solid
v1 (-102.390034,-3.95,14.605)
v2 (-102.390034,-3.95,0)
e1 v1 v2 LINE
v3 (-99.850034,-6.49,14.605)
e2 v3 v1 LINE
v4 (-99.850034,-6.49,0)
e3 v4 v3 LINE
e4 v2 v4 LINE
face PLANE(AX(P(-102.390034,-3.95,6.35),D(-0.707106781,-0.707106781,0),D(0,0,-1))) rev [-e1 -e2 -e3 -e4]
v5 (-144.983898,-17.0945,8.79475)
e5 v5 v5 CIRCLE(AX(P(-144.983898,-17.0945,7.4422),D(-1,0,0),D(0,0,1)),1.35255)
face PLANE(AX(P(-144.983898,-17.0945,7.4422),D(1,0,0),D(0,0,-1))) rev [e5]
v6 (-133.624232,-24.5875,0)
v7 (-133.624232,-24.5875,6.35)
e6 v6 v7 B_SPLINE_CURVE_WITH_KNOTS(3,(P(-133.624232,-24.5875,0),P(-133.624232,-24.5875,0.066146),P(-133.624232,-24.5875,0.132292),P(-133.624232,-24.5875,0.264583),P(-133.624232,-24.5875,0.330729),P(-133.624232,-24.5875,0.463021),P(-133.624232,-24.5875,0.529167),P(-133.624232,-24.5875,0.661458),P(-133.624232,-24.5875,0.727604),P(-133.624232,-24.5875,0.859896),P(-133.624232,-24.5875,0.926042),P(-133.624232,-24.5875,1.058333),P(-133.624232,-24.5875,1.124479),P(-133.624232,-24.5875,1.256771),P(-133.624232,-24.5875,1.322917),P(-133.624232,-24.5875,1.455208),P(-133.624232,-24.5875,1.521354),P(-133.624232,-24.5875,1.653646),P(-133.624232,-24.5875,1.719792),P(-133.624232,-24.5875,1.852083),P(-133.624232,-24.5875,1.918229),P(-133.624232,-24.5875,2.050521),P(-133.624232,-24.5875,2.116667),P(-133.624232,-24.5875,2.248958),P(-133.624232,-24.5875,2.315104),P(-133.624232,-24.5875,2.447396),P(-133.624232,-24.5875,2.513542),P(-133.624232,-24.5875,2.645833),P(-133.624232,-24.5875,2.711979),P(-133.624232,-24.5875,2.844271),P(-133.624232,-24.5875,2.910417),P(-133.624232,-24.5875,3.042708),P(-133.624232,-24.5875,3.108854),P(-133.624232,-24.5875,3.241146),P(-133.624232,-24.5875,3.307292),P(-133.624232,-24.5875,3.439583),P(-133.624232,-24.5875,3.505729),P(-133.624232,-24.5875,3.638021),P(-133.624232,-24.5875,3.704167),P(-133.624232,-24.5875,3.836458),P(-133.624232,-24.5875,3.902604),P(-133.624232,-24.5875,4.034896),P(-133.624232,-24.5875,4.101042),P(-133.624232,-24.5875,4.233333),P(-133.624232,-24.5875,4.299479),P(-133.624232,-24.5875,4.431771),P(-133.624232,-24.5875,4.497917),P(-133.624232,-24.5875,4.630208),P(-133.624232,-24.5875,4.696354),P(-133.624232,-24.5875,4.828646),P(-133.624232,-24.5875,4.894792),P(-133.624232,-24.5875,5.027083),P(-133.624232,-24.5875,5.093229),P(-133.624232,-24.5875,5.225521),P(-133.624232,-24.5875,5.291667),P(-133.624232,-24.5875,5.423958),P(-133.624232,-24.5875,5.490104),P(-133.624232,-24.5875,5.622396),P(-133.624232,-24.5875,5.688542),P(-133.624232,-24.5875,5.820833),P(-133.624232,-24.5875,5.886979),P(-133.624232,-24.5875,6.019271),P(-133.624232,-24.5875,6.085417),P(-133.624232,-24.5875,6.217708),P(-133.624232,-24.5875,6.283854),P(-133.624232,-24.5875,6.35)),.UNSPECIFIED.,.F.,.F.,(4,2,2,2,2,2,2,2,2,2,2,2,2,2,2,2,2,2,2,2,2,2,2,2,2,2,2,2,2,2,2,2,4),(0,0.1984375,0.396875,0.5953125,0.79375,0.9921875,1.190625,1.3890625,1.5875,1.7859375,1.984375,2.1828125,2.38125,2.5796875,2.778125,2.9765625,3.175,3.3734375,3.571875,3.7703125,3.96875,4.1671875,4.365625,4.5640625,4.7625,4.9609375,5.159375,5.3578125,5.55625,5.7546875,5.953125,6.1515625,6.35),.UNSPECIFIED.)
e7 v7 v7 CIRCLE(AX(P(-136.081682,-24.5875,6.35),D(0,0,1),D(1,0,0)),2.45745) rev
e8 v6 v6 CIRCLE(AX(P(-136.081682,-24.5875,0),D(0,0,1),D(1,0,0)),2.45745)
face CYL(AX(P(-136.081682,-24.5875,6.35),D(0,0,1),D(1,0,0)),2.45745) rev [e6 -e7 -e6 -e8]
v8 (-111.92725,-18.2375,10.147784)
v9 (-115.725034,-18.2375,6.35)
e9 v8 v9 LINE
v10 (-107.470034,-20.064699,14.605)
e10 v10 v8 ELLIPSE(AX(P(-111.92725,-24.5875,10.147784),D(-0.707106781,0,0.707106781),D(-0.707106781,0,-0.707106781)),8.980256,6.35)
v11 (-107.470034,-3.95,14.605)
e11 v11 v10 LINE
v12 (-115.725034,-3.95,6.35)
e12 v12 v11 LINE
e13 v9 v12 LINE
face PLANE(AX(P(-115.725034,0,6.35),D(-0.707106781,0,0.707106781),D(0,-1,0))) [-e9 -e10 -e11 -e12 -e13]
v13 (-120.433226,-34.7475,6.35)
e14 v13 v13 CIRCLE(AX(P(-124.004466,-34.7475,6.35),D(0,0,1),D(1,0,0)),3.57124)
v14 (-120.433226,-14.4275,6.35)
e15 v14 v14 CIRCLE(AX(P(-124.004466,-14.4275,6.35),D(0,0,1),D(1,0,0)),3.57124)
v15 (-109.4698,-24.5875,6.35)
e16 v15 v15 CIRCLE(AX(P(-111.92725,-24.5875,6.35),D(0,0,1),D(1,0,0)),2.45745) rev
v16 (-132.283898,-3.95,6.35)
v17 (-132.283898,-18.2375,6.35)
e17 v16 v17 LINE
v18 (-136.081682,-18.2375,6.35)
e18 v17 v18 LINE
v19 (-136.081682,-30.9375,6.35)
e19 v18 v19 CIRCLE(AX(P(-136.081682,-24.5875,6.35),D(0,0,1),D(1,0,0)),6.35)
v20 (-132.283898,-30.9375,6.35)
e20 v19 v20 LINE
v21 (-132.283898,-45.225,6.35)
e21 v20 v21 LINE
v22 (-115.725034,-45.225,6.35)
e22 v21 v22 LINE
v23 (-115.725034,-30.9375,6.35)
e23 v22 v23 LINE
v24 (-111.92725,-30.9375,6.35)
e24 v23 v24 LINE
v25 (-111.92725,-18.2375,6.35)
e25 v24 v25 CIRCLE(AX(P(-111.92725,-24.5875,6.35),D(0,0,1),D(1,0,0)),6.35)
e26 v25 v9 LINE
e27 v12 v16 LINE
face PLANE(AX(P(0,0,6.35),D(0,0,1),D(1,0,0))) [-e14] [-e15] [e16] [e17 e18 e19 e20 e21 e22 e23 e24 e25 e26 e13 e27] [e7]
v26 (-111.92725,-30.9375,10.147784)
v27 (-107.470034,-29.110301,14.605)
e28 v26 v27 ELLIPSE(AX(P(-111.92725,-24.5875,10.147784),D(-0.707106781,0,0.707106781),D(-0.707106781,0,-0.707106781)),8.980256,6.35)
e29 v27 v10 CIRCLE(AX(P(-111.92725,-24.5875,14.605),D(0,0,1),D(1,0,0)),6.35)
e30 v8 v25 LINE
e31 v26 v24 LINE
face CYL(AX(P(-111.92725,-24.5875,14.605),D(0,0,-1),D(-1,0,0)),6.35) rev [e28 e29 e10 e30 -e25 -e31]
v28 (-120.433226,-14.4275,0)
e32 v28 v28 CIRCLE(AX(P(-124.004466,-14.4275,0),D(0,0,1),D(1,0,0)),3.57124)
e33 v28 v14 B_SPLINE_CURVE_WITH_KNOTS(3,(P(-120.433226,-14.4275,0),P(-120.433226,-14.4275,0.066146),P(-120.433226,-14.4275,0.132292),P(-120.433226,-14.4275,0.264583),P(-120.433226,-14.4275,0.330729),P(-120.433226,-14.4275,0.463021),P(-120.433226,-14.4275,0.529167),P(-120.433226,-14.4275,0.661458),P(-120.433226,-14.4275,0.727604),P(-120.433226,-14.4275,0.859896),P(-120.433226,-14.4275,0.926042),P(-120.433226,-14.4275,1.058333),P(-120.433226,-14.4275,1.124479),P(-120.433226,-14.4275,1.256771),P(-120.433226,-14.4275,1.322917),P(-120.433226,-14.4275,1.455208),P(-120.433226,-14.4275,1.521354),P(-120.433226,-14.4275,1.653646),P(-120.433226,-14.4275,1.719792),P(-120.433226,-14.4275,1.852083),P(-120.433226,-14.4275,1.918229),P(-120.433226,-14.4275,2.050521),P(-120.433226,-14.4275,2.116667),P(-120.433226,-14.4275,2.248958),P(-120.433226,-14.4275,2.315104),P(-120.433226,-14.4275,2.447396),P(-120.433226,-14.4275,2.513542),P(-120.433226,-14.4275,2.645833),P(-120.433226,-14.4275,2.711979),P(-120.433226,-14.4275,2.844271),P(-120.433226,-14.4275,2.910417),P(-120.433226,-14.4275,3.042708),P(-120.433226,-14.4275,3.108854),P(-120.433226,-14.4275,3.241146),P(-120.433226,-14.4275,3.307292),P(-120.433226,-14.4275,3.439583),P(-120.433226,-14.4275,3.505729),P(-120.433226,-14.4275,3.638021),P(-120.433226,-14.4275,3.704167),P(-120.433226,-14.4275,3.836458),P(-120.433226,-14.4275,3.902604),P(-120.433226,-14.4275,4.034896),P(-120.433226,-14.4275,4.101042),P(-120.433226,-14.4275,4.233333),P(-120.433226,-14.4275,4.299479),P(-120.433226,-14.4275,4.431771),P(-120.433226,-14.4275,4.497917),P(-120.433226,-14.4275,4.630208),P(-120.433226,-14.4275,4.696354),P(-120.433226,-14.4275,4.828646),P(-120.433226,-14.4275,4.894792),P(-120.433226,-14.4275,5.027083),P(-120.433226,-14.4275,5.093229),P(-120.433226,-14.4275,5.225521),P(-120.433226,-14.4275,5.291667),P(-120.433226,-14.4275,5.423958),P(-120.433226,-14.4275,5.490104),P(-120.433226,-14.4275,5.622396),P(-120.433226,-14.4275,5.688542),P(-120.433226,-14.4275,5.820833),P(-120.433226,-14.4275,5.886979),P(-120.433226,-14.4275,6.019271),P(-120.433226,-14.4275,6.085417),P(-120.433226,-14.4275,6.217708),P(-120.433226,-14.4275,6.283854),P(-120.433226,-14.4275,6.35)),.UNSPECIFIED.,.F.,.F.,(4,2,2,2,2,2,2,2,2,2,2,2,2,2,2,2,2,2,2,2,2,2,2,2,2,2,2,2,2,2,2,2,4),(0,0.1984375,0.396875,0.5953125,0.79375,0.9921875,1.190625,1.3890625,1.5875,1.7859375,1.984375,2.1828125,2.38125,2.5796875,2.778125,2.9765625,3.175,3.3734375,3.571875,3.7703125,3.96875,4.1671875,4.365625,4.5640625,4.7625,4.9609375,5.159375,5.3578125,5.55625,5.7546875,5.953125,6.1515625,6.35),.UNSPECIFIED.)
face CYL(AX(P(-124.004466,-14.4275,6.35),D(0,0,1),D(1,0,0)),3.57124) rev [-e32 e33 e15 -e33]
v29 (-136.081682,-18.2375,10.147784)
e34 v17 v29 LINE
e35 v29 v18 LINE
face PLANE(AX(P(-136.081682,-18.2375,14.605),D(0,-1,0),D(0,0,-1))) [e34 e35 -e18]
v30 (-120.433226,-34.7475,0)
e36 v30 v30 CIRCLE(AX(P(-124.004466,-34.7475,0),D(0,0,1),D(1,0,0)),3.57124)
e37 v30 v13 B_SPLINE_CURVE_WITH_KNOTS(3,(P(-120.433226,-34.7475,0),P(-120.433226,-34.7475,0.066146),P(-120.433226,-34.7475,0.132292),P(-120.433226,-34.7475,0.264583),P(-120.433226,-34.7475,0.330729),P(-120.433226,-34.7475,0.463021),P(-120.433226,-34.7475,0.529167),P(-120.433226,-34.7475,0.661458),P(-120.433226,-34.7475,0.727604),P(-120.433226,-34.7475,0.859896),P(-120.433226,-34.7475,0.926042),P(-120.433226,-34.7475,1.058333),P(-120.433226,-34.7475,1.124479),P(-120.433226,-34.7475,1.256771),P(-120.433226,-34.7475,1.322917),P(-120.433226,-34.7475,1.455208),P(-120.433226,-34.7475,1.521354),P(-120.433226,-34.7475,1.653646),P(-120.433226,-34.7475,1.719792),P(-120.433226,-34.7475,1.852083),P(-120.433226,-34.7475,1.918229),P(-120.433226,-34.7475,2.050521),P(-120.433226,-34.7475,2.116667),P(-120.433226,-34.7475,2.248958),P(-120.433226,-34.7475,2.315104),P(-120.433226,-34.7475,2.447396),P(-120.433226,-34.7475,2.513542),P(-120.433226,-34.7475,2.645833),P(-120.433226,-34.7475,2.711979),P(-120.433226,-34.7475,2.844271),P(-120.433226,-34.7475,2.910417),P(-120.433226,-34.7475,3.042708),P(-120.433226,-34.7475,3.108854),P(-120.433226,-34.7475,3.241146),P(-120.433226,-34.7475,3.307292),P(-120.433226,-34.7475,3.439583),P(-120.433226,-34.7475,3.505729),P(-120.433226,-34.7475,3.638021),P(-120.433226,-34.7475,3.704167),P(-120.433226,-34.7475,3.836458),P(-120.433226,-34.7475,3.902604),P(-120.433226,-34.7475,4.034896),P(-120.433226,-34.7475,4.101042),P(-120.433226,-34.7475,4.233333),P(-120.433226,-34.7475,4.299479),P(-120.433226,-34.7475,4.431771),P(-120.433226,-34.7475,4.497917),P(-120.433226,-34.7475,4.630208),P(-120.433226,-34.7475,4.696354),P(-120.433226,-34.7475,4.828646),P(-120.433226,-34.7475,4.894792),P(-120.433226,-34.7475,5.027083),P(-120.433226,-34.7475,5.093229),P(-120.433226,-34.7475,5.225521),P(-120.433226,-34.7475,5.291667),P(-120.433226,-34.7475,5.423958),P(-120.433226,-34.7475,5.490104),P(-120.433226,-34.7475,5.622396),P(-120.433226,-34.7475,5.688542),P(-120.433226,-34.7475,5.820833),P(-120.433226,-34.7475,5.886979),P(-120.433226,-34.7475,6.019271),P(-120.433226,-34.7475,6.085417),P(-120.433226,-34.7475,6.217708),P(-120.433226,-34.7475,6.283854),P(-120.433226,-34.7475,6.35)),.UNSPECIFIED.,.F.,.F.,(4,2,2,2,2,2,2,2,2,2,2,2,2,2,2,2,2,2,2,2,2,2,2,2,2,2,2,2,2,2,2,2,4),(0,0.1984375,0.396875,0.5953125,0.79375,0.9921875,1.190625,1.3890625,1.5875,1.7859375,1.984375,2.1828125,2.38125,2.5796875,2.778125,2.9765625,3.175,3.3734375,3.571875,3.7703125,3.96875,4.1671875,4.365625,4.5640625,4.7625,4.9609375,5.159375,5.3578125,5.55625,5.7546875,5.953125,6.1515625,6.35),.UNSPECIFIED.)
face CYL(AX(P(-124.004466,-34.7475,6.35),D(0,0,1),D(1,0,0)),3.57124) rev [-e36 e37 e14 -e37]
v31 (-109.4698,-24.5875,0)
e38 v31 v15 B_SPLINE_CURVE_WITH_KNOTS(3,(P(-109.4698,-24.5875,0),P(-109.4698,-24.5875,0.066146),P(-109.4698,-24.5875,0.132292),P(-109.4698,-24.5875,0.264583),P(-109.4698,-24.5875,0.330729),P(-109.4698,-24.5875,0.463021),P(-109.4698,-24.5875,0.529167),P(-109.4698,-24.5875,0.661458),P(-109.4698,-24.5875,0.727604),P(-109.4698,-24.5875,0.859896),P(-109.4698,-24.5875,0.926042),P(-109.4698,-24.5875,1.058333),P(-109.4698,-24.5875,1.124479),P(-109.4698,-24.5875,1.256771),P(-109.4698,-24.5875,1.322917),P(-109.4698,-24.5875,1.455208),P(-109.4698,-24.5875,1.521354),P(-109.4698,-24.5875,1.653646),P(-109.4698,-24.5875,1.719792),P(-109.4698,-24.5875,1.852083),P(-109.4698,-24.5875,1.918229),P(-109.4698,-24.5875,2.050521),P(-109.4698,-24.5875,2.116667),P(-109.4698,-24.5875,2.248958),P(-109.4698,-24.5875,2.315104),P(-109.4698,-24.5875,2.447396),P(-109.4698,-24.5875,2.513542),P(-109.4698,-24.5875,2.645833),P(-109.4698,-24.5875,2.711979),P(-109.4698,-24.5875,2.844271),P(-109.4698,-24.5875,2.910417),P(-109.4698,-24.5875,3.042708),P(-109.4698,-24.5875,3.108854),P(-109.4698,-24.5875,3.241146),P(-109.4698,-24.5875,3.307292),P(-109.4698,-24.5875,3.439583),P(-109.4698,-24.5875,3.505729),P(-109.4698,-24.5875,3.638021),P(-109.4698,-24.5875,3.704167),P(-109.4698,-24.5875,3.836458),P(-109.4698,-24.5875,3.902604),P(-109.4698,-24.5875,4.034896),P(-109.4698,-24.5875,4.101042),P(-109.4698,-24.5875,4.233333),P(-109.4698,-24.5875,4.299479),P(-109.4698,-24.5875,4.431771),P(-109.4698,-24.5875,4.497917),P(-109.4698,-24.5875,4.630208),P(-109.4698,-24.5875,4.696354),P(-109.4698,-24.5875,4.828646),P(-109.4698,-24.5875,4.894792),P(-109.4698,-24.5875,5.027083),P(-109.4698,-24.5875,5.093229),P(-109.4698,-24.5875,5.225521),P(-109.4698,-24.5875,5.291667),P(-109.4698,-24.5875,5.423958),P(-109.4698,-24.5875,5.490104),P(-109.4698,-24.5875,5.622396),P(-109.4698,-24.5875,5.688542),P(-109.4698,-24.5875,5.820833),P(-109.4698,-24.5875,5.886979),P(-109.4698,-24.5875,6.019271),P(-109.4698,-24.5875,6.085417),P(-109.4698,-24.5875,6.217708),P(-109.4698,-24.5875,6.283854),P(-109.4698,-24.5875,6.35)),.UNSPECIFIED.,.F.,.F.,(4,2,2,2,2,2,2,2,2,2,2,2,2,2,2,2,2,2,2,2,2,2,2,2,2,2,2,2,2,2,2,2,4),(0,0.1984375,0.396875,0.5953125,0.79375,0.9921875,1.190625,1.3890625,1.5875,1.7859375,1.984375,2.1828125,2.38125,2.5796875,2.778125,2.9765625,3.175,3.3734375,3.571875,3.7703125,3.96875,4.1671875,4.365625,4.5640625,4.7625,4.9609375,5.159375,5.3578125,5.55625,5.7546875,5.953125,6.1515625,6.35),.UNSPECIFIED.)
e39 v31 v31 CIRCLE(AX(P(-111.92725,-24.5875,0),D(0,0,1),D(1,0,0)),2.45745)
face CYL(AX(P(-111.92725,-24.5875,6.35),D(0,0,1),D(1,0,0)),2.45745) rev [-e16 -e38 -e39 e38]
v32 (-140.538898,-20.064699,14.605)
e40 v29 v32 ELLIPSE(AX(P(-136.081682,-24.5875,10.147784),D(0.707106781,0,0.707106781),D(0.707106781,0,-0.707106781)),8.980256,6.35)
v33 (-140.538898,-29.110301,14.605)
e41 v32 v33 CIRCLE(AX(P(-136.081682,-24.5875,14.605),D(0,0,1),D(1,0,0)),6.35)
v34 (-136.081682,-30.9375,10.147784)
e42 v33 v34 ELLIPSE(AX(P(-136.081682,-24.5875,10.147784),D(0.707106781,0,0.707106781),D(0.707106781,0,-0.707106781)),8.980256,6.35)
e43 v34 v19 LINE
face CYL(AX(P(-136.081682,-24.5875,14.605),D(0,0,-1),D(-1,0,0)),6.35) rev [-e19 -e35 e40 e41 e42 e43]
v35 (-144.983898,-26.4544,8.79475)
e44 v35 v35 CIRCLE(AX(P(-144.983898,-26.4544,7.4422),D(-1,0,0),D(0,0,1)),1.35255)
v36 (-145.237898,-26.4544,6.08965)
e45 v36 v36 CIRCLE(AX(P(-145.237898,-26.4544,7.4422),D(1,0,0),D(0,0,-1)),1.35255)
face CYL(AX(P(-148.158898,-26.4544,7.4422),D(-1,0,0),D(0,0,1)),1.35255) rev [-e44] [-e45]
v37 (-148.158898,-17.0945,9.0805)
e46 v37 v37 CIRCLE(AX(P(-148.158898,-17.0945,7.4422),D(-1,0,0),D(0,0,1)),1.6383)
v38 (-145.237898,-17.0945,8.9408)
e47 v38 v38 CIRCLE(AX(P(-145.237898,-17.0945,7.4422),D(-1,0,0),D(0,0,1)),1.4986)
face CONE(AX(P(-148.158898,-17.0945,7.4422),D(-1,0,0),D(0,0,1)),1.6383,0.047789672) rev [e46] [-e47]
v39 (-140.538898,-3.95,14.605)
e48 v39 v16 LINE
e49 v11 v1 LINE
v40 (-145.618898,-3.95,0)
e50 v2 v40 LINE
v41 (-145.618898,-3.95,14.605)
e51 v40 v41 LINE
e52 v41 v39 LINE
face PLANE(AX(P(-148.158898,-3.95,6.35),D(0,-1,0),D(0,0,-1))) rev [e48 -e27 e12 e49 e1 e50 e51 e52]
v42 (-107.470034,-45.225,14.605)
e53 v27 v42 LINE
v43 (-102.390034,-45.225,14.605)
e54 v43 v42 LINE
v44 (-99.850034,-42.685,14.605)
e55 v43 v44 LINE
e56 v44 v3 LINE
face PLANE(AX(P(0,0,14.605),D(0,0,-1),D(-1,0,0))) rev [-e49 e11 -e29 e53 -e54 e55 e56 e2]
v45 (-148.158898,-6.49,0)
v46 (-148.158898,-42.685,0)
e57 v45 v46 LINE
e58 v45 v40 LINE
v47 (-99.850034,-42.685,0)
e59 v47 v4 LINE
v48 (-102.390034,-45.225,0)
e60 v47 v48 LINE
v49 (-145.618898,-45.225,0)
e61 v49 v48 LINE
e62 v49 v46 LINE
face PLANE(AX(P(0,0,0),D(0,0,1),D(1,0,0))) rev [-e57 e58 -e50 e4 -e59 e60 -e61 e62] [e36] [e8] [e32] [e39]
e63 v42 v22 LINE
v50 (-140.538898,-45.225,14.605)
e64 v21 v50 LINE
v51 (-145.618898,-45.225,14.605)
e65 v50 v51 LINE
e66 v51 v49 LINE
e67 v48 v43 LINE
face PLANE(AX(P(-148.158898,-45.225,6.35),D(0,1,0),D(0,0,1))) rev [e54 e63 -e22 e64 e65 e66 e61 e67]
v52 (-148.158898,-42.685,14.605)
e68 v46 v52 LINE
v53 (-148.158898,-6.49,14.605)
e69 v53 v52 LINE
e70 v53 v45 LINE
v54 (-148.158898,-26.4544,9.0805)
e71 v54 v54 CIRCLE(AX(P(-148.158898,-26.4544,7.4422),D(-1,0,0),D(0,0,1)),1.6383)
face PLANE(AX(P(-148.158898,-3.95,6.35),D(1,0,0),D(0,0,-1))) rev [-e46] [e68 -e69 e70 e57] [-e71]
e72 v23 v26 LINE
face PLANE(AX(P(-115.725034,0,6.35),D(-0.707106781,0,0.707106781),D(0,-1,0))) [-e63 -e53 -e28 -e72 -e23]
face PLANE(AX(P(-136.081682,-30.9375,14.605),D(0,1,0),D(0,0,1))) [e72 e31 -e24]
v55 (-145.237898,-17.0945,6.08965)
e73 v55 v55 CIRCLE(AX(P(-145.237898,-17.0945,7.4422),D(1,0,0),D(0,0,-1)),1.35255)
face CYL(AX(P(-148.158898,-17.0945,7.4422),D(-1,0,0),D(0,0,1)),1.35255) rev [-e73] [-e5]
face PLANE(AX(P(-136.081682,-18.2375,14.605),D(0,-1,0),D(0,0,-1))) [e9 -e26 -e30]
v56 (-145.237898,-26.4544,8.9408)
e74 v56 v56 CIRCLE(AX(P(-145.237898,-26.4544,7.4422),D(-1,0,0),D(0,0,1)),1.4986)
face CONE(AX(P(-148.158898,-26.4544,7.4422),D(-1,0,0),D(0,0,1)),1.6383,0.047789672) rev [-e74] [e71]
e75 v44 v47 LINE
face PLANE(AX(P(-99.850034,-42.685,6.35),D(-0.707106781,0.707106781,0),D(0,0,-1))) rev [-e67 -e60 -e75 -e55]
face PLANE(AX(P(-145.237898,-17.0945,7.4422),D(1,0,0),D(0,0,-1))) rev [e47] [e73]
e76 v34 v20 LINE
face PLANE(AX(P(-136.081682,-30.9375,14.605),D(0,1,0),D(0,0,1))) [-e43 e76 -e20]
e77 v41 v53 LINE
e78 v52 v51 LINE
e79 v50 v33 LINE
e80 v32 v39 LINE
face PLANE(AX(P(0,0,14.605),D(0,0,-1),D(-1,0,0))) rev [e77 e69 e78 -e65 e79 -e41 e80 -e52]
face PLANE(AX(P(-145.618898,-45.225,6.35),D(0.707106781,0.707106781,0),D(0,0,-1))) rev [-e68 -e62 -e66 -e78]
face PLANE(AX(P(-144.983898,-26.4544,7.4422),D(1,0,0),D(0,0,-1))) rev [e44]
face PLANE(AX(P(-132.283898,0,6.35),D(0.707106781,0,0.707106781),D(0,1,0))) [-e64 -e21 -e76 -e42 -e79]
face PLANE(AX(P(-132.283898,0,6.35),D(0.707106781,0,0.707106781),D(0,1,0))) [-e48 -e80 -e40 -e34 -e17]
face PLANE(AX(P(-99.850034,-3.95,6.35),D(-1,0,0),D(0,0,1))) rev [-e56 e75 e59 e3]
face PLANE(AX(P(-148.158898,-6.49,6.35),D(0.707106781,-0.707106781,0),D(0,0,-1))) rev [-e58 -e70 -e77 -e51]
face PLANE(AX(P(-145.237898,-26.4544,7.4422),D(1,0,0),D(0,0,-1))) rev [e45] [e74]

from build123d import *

# Parameters (mm, degrees)
SKETCH1_W                 = 48.308864232
SKETCH1_H                 = 41.275
BOSS_EXTRUDE1_DEPTH       = 6.35
F_8_CLEARANCE_HOLE1_D     = 4.9149
F_1_4_CLEARANCE_HOLE1_D   = 7.14248
SKETCH9_W                 = 6.35
SKETCH9_H                 = 41.275
EXTRUDE_THIN1_DEPTH       = 8.255
CHAMFER2_SIZE             = 9.525
CUT_EXTRUDE1_DEPTH        = 156.127382276
CHAMFER1_SIZE             = 2.54
HOLE1_AT_2_COUNT          = 2
HOLE1_AT_2_PITCH          = 9.3599
F_2_CLEARANCE_HOLE1_D     = 2.7051
F_2_CLEARANCE_HOLE1_DEPTH = 3.175


with BuildPart() as part:
    # Sketch1 → Boss-Extrude1 (new body)
    with BuildSketch(Plane.XY):
        with Locations((-124.004465969, -24.5875)):
            Rectangle(SKETCH1_W, SKETCH1_H)
    extrude(amount=BOSS_EXTRUDE1_DEPTH)

    # #8 Clearance Hole1 (through all)
    with Locations(Plane.XY.offset(6.35)):
        with Locations((-111.927249911, -24.5875), (-136.081682027, -24.5875)):
            Hole(F_8_CLEARANCE_HOLE1_D / 2)

    # 1/4 Clearance Hole1 (through all)
    with Locations(Plane.XY.offset(6.35)):
        with Locations((-124.004465969, -14.4275), (-124.004465969, -34.7475)):
            Hole(F_1_4_CLEARANCE_HOLE1_D / 2)

    # Sketch9 → Extrude-Thin1 (add)
    with BuildSketch(Plane.XY.offset(6.35)):
        with Locations((-103.025033853, -24.5875)):
            Rectangle(SKETCH9_W, SKETCH9_H)
        with Locations((-144.983898085, -24.5875)):
            Rectangle(SKETCH9_W, SKETCH9_H)
    extrude(amount=EXTRUDE_THIN1_DEPTH)

    # Chamfer2
    # the kernel refuses this chamfer: 9.525 mm, written as the material it adds along each edge
    with BuildSketch(Plane(origin=(-106.200033853, -3.95, 6.35), x_dir=(0.0274958766105871, 0, 0.9996219169112966), z_dir=(0, -1, 0))) as chamfer2_piece_1_section:
        Polygon((CHAMFER2_SIZE * 0.999621916911, CHAMFER2_SIZE * 0.0274958766106), (-CHAMFER2_SIZE * 0.0274958766106, CHAMFER2_SIZE * 0.999621916911), (0, 0), align=None)
    chamfer2_piece_1 = extrude(amount=41.275, mode=Mode.PRIVATE)
    chamfer2_piece_1 = chamfer2_piece_1 - Plane(origin=(-111.927249911, -24.5875, 9.368765613), x_dir=(-1, 0, 0), z_dir=(0, 0, -1)) * Cylinder(2.45745, 121, mode=Mode.PRIVATE)
    chamfer2_piece_1 = split(chamfer2_piece_1, bisect_by=Plane(origin=(-109.341812124, -24.58749874, 14.605), z_dir=(0, 0, -1)), keep=Keep.TOP, mode=Mode.PRIVATE)
    add(chamfer2_piece_1)
    with BuildSketch(Plane(origin=(-141.808898085, -45.225, 6.35), x_dir=(0.9996219169112968, 0, -0.027495876610586386), z_dir=(0, 1, 0))) as chamfer2_piece_2_section:
        Polygon((CHAMFER2_SIZE * 0.999621916911, -CHAMFER2_SIZE * 0.0274958766106), (-CHAMFER2_SIZE * 0.0274958766106, -CHAMFER2_SIZE * 0.999621916911), (0, 0), align=None)
    chamfer2_piece_2 = extrude(amount=41.275, mode=Mode.PRIVATE)
    chamfer2_piece_2 = chamfer2_piece_2 - Plane(origin=(-136.081682027, -24.5875, 9.368765819), x_dir=(-1, 0, 0), z_dir=(0, 0, -1)) * Cylinder(2.45745, 121, mode=Mode.PRIVATE)
    chamfer2_piece_2 = split(chamfer2_piece_2, bisect_by=Plane(origin=(-138.667118685, -24.587501904, 14.605), z_dir=(0, 0, -1)), keep=Keep.TOP, mode=Mode.PRIVATE)
    add(chamfer2_piece_2)

    # Sketch10 → Cut-Extrude1 (cut, through all)
    with BuildSketch(Plane.XY.offset(6.35)):
        with BuildLine():
            Line((-136.081682027, -18.2375), (-111.927249911, -18.2375))
            ThreePointArc((-111.927249911, -18.2375), (-105.577249911, -24.5875), (-111.927249911, -30.9375))
            Line((-111.927249911, -30.9375), (-136.081682027, -30.9375))
            ThreePointArc((-136.081682027, -30.9375), (-142.431682027, -24.5875), (-136.081682027, -18.2375))
        make_face()
    extrude(amount=CUT_EXTRUDE1_DEPTH, mode=Mode.SUBTRACT)

    # Chamfer1
    chamfer1_edges = [part.edges().sort_by_distance(p)[0] for p in [
        (-99.850033853, -45.225, 7.3025),
        (-148.158898085, -45.225, 7.3025),
        (-148.158898085, -3.95, 7.3025),
        (-99.850033853, -3.95, 7.3025),
    ]]
    chamfer(chamfer1_edges, length=CHAMFER1_SIZE)

    # Sketch12 → Hole1 (revolve, cut)
    with BuildSketch(Plane(origin=(-148.158898085, -26.4544, 7.4422), x_dir=(0, 0, 1), z_dir=(0, 1, 0))):
        Polygon((0, 0), (0, 2.921), (1.4986, 2.921), (1.6383, 0), align=None)
    hole1 = revolve(axis=Axis((-38.158898085, -26.4544, 7.4422), (-1, 0, 0)), mode=Mode.SUBTRACT)

    # Hole1 at 2: Hole1 ×2
    with Locations(*[(0, i * HOLE1_AT_2_PITCH, 0) for i in range(1, HOLE1_AT_2_COUNT)]):
        add(hole1, mode=Mode.SUBTRACT)

    # #2 Clearance Hole1
    with Locations(Plane.ZY.offset(148.158898085)):
        with Locations((7.4422, -17.0945), (7.4422, -26.4544)):
            Hole(F_2_CLEARANCE_HOLE1_D / 2, depth=F_2_CLEARANCE_HOLE1_DEPTH)


solid = part.part
